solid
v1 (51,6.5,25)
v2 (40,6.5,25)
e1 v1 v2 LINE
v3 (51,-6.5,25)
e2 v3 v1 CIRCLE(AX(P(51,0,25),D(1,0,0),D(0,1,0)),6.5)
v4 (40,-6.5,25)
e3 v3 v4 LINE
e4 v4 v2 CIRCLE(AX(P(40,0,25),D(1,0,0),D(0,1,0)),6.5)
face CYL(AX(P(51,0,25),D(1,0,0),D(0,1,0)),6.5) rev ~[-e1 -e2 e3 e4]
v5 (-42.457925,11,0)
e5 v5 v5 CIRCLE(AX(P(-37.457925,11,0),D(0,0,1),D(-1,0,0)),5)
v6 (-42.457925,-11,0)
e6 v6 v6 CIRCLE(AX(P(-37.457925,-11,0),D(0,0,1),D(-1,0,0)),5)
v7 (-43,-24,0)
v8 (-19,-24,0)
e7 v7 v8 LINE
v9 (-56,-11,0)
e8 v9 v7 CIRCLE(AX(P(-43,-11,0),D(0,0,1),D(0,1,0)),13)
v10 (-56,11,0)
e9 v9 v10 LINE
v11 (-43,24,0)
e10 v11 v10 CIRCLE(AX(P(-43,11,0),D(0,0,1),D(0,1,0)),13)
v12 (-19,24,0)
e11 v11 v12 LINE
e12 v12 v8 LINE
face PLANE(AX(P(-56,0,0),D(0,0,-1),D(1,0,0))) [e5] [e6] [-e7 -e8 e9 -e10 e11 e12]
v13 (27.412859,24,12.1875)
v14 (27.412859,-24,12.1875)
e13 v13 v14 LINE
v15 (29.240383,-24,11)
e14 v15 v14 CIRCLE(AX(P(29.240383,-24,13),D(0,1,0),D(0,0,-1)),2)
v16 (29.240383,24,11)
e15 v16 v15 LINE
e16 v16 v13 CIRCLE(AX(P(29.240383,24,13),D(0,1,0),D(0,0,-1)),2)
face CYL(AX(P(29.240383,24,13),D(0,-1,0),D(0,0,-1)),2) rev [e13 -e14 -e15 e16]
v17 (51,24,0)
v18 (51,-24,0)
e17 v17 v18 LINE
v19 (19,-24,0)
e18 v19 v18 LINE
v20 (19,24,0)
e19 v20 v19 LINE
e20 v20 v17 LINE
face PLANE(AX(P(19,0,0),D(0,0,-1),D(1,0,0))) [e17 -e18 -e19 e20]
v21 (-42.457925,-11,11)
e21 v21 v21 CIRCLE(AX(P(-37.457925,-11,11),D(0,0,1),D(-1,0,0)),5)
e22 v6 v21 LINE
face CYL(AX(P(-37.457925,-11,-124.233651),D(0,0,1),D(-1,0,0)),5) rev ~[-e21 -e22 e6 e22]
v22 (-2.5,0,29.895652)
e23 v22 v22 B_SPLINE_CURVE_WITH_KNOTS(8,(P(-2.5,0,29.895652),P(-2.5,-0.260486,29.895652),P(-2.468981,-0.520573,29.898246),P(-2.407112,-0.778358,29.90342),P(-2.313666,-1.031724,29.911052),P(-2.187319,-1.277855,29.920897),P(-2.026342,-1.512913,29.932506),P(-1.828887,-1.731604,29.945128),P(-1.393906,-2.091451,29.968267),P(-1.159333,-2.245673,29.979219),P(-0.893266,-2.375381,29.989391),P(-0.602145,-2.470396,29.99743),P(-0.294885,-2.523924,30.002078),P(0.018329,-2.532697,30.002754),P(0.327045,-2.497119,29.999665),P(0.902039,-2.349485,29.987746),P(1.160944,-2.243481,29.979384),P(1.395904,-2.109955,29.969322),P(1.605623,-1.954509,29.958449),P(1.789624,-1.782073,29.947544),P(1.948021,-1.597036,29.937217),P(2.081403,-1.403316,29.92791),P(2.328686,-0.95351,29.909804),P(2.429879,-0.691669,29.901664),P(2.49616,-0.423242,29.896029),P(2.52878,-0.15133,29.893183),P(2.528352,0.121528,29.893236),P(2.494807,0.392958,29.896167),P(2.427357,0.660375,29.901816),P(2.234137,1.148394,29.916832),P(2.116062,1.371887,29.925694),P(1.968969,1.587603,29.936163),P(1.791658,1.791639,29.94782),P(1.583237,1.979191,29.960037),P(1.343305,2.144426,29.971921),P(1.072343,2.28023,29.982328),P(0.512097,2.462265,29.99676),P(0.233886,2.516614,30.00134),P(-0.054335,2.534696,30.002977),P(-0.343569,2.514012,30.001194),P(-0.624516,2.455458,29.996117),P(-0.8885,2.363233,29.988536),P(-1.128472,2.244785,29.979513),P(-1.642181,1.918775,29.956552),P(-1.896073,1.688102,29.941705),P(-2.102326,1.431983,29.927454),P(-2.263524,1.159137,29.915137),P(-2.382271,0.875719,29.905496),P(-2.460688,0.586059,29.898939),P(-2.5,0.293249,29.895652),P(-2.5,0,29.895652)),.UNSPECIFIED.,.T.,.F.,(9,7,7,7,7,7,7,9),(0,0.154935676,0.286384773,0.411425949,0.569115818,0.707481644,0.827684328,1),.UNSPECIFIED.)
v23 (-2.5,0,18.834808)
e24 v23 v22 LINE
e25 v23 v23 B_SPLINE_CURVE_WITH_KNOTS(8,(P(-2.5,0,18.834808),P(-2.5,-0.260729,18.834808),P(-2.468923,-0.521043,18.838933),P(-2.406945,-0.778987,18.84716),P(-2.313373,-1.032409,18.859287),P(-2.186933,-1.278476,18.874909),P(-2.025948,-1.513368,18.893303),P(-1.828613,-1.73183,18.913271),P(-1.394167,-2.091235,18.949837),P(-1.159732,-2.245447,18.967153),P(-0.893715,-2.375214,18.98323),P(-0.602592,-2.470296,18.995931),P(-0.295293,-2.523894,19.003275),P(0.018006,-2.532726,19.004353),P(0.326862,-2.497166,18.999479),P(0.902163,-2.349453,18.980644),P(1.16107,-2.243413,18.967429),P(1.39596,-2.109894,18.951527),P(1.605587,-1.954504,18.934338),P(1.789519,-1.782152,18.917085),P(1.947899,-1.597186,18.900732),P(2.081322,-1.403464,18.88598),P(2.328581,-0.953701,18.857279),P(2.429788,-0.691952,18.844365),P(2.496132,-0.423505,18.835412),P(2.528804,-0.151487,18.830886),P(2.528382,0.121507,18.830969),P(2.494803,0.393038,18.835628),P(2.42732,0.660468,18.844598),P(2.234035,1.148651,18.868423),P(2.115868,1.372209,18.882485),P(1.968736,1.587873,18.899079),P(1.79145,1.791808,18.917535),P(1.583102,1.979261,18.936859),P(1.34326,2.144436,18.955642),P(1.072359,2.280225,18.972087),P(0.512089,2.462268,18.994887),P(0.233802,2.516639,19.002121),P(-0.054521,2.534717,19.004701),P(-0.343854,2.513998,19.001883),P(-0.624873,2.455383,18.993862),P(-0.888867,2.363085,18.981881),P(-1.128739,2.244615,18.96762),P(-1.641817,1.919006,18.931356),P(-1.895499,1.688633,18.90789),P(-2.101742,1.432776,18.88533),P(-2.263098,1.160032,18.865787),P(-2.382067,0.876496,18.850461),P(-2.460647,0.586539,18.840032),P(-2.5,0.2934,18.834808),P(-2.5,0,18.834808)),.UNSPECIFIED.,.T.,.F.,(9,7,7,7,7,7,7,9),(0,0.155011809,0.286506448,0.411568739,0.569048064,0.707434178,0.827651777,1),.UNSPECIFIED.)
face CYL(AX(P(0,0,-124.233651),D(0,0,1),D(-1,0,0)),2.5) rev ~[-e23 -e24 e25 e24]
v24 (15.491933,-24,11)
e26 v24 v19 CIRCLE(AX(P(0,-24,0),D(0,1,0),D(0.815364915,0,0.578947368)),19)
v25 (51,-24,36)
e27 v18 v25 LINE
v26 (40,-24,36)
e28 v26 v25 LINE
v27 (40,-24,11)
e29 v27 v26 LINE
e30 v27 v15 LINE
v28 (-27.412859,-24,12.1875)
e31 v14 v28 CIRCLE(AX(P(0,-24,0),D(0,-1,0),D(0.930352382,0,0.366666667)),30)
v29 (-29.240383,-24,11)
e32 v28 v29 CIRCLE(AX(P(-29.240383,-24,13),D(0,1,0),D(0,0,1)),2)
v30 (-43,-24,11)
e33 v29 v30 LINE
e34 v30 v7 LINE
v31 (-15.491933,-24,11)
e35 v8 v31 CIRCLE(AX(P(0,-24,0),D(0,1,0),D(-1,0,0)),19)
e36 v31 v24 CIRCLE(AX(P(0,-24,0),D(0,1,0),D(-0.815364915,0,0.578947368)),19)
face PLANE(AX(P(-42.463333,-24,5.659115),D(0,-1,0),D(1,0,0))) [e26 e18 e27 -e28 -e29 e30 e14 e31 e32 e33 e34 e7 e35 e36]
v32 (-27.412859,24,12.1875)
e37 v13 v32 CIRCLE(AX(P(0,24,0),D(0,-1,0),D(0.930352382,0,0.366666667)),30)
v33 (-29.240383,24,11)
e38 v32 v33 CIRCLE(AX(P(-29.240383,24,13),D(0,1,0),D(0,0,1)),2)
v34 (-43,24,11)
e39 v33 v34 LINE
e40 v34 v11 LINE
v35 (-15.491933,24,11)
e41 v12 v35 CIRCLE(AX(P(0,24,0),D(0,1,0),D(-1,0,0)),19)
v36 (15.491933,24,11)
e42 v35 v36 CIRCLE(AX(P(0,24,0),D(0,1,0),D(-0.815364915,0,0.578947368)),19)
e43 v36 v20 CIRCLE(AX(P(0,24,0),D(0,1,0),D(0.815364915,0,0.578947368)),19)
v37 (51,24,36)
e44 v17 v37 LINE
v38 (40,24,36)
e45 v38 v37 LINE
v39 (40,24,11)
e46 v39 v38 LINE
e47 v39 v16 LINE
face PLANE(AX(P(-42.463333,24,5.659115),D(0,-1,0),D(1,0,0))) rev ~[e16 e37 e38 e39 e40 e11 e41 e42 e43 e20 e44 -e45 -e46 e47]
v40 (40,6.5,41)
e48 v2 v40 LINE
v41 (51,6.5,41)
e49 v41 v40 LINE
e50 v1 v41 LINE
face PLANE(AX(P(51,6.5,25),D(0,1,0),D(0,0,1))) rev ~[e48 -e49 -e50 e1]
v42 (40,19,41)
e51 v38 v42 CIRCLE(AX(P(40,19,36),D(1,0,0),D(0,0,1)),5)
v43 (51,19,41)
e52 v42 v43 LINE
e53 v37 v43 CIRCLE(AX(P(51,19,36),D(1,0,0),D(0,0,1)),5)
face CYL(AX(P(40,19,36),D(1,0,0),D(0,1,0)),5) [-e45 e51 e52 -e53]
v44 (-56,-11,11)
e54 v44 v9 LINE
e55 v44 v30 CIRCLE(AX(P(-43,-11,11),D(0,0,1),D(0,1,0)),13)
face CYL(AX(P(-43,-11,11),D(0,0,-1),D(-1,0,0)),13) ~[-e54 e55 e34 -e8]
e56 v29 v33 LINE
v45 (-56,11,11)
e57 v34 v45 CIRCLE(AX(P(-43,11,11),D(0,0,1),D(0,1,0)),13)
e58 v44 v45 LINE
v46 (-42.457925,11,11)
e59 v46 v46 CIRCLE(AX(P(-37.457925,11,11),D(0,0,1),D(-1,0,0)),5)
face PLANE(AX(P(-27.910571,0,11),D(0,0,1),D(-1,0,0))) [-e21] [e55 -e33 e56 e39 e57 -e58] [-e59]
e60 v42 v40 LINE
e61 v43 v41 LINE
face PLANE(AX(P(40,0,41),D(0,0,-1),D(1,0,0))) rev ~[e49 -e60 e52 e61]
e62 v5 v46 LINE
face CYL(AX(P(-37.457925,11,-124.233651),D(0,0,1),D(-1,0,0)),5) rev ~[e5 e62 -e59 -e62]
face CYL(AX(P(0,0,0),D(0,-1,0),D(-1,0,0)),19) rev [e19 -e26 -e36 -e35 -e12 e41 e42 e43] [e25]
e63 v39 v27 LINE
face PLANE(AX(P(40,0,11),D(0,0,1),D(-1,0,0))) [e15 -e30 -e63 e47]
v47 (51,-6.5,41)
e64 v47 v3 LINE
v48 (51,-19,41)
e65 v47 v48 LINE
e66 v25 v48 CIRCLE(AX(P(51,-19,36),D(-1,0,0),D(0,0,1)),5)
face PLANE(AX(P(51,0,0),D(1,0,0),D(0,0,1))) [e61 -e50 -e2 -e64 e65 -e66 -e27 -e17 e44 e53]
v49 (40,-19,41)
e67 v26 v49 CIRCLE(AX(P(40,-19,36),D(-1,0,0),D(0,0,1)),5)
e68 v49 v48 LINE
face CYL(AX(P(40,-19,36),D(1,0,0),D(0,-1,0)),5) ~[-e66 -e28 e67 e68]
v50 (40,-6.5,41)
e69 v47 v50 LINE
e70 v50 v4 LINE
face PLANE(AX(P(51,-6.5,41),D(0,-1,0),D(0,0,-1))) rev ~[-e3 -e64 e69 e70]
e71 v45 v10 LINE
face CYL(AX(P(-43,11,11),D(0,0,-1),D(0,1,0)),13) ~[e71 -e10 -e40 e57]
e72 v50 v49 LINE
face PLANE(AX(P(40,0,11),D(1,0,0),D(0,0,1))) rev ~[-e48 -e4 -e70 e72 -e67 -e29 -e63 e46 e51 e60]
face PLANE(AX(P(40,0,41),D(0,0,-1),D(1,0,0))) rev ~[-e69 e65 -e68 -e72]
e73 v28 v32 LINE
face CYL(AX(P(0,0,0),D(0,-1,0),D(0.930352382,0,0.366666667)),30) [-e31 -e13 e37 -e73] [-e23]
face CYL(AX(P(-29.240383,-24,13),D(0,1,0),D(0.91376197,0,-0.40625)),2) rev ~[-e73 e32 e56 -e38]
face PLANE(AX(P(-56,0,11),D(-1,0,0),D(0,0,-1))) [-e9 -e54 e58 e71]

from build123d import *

# Parameters (mm, degrees)
F0_W     = 11
F0_H     = 30
F1_DEPTH = 24
F3_DEPTH = 17.3
F5_D     = 10
F6_D     = 5
F7_R     = 13
F8_R     = 5
F9_R     = 2


with BuildPart() as f1:
    # F0 (on Front) → F1 (new body, symmetric)
    with BuildSketch(Plane.XZ):
        with BuildLine():
            Line((-56, 0), (-30, 0))
            ThreePointArc((-30, 0), (-29.4730143031, 5.5983415304), (-27.9105714739, 11))
            Line((-27.9105714739, 11), (-56, 11))
            Line((-56, 11), (-56, 0))
        make_face()
        with BuildLine():
            Line((-30, 0), (-19, 0))
            ThreePointArc((-19, 0), (-18.1017503893, 5.7729223833), (-15.4919333848, 11))
            Line((-15.4919333848, 11), (-27.9105714739, 11))
            ThreePointArc((-27.9105714739, 11), (-29.4730143031, 5.5983415304), (-30, 0))
        make_face()
        with BuildLine():
            ThreePointArc((-15.4919333848, 11), (0, 19), (15.4919333848, 11))
            Line((15.4919333848, 11), (27.9105714739, 11))
            ThreePointArc((27.9105714739, 11), (0, 30), (-27.9105714739, 11))
            Line((-27.9105714739, 11), (-15.4919333848, 11))
        make_face()
        with BuildLine():
            ThreePointArc((15.4919333848, 11), (18.1017503893, 5.7729223833), (19, 0))
            Line((19, 0), (30, 0))
            ThreePointArc((30, 0), (29.4730143031, 5.5983415304), (27.9105714739, 11))
            Line((27.9105714739, 11), (15.4919333848, 11))
        make_face()
        with BuildLine():
            ThreePointArc((27.9105714739, 11), (29.4730143031, 5.5983415304), (30, 0))
            Line((30, 0), (51, 0))
            Line((51, 0), (51, 11))
            Line((51, 11), (40, 11))
            Line((40, 11), (27.9105714739, 11))
        make_face()
        with Locations((45.5, 26)):
            Rectangle(F0_W, F0_H)
    extrude(amount=F1_DEPTH, both=True)

    # F2 (on face) → F3 (cut)
    with BuildSketch(Plane.YZ.offset(51)):
        with BuildLine():
            ThreePointArc((-6.5, 25), (0, 18.5), (6.5, 25))
            ThreePointArc((6.5, 25), (0, 31.5), (-6.5, 25))
        make_face()
        with BuildLine():
            ThreePointArc((-6.5, 25), (0, 31.5), (6.5, 25))
            Line((6.5, 25), (6.5, 41))
            Line((6.5, 41), (-6.5, 41))
            Line((-6.5, 41), (-6.5, 25))
        make_face()
    extrude(amount=-F3_DEPTH, mode=Mode.SUBTRACT)

    # F5 (through all)
    with Locations(Plane(origin=(0, 0, 0), x_dir=(1, 0, 0), z_dir=(0, 0, -1))):
        with Locations((-37.4579249547, -11), (-37.4579249547, 11)):
            Hole(F5_D / 2)

    # F6 (through all)
    with Locations(Plane(origin=(0, 0, 0), x_dir=(1, 0, 0), z_dir=(0, 0, -1))):
        with Locations((0, 0)):
            Hole(F6_D / 2)

    # F7
    f7_edges = [f1.edges().sort_by_distance(p)[0] for p in [
        (-56, -24, 5.5),
        (-56, 24, 5.5),
    ]]
    fillet(f7_edges, radius=F7_R)

    # F8
    f8_edges = [f1.edges().sort_by_distance(p)[0] for p in [
        (45.5, 24, 41),
        (45.5, -24, 41),
    ]]
    fillet(f8_edges, radius=F8_R)

    # F9
    f9_edges = [f1.edges().sort_by_distance(p)[0] for p in [
        (27.910571, 0, 11),
        (-27.910571, 0, 11),
    ]]
    fillet(f9_edges, radius=F9_R)


solid = f1.part
